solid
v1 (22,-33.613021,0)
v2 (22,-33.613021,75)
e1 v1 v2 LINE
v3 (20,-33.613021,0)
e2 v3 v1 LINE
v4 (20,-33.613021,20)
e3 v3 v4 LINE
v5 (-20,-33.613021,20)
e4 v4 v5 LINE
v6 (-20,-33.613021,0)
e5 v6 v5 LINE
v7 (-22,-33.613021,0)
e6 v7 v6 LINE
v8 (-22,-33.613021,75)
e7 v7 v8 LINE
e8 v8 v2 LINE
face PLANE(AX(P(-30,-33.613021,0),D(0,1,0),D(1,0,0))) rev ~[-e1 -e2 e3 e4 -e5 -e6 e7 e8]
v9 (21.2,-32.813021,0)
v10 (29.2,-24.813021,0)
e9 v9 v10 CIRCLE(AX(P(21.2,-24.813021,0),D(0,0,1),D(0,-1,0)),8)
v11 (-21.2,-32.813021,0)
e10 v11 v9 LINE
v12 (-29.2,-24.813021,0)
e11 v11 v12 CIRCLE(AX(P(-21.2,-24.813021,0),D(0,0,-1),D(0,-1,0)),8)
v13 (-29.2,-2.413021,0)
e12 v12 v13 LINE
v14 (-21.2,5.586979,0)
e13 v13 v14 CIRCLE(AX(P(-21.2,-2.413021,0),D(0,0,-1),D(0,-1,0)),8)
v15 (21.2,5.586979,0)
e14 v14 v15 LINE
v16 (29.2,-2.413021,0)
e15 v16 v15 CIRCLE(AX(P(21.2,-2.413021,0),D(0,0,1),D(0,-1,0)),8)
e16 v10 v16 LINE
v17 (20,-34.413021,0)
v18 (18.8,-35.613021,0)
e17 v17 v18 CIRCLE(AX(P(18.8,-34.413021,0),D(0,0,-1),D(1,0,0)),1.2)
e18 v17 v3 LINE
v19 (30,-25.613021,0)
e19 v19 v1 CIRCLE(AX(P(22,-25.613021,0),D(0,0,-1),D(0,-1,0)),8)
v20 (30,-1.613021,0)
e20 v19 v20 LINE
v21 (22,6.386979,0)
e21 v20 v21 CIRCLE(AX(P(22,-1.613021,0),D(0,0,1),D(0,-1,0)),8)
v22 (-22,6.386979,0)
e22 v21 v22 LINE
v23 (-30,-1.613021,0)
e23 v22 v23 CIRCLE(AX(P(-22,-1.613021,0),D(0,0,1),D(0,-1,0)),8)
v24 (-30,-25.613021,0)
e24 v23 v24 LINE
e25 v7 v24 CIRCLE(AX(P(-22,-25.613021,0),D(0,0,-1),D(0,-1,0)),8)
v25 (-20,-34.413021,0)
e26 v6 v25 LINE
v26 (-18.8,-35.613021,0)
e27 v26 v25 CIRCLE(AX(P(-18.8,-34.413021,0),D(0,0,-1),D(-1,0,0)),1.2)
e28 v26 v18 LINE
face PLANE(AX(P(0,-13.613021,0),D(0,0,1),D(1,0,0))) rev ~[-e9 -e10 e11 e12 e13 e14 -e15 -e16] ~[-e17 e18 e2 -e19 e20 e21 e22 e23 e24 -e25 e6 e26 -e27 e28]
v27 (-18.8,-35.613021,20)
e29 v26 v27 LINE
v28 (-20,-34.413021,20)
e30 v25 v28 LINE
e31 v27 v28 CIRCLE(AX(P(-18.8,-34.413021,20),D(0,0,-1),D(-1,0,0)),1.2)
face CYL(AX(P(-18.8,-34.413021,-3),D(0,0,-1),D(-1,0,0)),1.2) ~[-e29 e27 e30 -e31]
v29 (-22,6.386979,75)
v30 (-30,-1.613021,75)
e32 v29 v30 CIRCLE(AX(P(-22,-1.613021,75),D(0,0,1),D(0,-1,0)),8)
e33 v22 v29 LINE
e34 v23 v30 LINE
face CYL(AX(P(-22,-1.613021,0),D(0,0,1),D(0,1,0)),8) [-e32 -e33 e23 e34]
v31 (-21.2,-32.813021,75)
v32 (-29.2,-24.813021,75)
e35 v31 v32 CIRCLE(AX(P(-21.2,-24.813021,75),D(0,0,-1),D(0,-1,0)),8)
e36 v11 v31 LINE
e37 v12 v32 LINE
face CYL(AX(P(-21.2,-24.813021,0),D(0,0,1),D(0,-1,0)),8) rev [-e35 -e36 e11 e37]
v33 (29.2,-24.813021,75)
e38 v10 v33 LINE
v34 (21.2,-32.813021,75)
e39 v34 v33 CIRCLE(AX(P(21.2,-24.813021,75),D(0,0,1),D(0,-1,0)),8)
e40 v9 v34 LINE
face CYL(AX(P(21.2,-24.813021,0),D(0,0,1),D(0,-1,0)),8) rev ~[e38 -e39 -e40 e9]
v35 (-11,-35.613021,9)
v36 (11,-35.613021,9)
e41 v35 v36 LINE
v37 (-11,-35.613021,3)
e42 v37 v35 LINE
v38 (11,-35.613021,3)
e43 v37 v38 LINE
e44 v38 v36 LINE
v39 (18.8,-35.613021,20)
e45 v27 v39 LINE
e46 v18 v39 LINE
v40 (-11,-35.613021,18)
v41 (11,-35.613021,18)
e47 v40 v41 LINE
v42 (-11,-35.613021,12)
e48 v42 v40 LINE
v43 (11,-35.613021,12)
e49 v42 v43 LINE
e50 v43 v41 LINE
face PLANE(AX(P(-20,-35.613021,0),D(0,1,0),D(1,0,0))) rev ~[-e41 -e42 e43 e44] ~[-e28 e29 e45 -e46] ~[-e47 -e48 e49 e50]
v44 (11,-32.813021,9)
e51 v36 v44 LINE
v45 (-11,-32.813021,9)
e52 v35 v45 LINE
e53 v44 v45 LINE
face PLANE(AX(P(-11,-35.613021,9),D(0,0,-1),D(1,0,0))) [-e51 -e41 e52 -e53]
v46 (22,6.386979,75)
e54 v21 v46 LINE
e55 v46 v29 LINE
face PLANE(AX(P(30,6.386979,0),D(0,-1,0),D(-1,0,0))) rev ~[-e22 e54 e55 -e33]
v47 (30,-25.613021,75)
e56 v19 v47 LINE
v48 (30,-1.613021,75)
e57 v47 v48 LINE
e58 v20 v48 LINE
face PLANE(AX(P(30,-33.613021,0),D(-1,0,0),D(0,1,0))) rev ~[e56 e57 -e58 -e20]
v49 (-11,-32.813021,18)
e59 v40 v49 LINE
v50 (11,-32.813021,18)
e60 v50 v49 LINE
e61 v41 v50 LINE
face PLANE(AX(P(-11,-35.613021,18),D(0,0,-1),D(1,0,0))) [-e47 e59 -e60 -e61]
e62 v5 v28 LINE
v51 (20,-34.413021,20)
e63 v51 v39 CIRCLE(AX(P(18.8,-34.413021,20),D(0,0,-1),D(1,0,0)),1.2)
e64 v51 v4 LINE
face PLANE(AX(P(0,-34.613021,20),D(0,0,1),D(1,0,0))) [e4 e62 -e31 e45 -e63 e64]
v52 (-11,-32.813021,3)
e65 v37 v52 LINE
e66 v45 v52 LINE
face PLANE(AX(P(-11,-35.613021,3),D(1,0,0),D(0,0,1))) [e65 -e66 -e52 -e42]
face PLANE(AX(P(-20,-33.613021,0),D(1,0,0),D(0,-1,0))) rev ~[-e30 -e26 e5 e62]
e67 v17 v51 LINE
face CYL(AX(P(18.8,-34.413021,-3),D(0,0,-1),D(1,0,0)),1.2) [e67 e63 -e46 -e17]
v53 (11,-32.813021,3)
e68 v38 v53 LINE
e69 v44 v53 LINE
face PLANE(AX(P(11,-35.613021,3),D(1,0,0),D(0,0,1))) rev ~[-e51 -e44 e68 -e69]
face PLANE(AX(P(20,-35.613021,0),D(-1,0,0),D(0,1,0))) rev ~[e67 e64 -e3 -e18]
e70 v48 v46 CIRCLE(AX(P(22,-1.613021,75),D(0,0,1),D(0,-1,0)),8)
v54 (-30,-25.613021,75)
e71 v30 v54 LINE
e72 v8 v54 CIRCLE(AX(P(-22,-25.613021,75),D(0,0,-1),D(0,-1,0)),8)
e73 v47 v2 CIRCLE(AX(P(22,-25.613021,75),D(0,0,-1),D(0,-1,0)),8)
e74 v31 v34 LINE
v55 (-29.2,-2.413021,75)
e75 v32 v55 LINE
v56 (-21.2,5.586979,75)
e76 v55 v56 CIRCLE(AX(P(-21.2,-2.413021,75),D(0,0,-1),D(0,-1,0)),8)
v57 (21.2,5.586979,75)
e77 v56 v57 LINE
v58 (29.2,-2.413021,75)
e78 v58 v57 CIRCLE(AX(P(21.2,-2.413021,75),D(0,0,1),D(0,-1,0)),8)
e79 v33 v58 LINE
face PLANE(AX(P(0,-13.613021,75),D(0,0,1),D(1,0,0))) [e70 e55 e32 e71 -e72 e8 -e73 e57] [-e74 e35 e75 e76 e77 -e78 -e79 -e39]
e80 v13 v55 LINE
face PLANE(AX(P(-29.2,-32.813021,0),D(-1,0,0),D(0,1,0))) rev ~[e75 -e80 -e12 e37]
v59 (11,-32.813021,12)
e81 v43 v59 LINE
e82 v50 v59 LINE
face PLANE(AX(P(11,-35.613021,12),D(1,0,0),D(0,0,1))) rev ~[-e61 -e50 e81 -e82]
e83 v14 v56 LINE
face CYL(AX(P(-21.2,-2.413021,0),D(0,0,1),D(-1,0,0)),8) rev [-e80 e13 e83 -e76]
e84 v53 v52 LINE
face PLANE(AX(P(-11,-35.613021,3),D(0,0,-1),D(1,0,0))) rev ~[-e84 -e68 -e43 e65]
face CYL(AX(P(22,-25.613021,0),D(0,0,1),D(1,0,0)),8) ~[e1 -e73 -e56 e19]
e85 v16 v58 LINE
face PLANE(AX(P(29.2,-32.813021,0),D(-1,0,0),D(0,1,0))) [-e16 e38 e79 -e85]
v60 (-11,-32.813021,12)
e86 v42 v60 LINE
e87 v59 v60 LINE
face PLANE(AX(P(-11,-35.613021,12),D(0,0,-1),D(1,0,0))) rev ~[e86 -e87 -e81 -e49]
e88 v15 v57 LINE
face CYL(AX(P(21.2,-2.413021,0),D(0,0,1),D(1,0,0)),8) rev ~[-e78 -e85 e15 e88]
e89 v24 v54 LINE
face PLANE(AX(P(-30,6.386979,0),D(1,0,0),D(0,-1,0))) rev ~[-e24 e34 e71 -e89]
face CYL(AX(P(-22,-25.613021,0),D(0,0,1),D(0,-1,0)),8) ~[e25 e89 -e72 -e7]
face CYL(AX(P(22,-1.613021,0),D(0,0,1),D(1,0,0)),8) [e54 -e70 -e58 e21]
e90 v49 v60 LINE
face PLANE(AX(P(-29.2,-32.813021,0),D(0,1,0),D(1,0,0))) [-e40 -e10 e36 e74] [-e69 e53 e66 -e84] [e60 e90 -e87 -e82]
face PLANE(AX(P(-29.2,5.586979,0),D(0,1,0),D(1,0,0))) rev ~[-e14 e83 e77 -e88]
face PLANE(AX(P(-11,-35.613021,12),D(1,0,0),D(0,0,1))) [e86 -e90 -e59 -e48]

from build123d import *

# Parameters (mm, degrees)
F1_DEPTH    = 20
F0_W        = 58.4
F0_H        = 38.4
F2_DEPTH    = 75
F3_T1_DEPTH = 26
F4_R        = 8
F5_W        = 22
F5_H        = 6
F6_DEPTH    = 3


# Not quite as in the source:
# - a fillet or chamfer that OpenCascade refuses, or shapes differently, is made with other operations: its cross-section is extruded or revolved along the edge and cut away or added


with BuildPart() as f1:
    # F0 (on Top) → F1 (new body)
    with BuildSketch(Plane.XY):
        Polygon((20, -35.6130205363), (20, -33.6130205363), (-20, -33.6130205363), (-20, -35.6130205363), (-10, -35.6130205363), (10, -35.6130205363), align=None)
    extrude(amount=F1_DEPTH)

    # F0 (on Top) → F2 (join)
    with BuildSketch(Plane.XY):
        Polygon((20, -33.6130205363), (30, -33.6130205363), (30, 6.3869794637), (-30, 6.3869794637), (-30, -33.6130205363), (-20, -33.6130205363), align=None)
        with Locations((0, -13.6130205363)):
            Rectangle(F0_W, F0_H, mode=Mode.SUBTRACT)
    extrude(amount=F2_DEPTH)

    # F3: fillet of radius 1.2 on 4 edges, made by hand

    # F3_s2 → F3_t1 (cut)
    with BuildSketch(Plane.XY.offset(-3)):
        with BuildLine():
            ThreePointArc((20, -34.4130205363), (19.6485281374, -35.2615486737), (18.8, -35.6130205363))
            Line((18.8, -35.6130205363), (20, -35.6130205363))
            Line((20, -35.6130205363), (20, -34.4130205363))
        make_face()
        with BuildLine():
            ThreePointArc((-20, -34.4130205363), (-19.6485281374, -35.2615486737), (-18.8, -35.6130205363))
            Line((-18.8, -35.6130205363), (-20, -35.6130205363))
            Line((-20, -35.6130205363), (-20, -34.4130205363))
        make_face()
    extrude(amount=F3_T1_DEPTH, mode=Mode.SUBTRACT)

    # F4
    f4_edges = [f1.edges().sort_by_distance(p)[0] for p in [
        (29.2, 5.586979, 37.5),
        (29.2, -32.813021, 37.5),
        (-29.2, -32.813021, 37.5),
        (-29.2, 5.586979, 37.5),
        (-30, -33.613021, 37.5),
        (-30, 6.386979, 37.5),
        (30, -33.613021, 37.5),
        (30, 6.386979, 37.5),
    ]]
    fillet(f4_edges, radius=F4_R)

    # F5 (on face) → F6 (cut)
    with BuildSketch(Plane.XZ.offset(35.6130205363)):
        with Locations((0, 15)):
            Rectangle(F5_W, F5_H)
        with Locations((0, 6)):
            Rectangle(F5_W, F5_H)
    extrude(amount=-F6_DEPTH, mode=Mode.SUBTRACT)


solid = f1.part
